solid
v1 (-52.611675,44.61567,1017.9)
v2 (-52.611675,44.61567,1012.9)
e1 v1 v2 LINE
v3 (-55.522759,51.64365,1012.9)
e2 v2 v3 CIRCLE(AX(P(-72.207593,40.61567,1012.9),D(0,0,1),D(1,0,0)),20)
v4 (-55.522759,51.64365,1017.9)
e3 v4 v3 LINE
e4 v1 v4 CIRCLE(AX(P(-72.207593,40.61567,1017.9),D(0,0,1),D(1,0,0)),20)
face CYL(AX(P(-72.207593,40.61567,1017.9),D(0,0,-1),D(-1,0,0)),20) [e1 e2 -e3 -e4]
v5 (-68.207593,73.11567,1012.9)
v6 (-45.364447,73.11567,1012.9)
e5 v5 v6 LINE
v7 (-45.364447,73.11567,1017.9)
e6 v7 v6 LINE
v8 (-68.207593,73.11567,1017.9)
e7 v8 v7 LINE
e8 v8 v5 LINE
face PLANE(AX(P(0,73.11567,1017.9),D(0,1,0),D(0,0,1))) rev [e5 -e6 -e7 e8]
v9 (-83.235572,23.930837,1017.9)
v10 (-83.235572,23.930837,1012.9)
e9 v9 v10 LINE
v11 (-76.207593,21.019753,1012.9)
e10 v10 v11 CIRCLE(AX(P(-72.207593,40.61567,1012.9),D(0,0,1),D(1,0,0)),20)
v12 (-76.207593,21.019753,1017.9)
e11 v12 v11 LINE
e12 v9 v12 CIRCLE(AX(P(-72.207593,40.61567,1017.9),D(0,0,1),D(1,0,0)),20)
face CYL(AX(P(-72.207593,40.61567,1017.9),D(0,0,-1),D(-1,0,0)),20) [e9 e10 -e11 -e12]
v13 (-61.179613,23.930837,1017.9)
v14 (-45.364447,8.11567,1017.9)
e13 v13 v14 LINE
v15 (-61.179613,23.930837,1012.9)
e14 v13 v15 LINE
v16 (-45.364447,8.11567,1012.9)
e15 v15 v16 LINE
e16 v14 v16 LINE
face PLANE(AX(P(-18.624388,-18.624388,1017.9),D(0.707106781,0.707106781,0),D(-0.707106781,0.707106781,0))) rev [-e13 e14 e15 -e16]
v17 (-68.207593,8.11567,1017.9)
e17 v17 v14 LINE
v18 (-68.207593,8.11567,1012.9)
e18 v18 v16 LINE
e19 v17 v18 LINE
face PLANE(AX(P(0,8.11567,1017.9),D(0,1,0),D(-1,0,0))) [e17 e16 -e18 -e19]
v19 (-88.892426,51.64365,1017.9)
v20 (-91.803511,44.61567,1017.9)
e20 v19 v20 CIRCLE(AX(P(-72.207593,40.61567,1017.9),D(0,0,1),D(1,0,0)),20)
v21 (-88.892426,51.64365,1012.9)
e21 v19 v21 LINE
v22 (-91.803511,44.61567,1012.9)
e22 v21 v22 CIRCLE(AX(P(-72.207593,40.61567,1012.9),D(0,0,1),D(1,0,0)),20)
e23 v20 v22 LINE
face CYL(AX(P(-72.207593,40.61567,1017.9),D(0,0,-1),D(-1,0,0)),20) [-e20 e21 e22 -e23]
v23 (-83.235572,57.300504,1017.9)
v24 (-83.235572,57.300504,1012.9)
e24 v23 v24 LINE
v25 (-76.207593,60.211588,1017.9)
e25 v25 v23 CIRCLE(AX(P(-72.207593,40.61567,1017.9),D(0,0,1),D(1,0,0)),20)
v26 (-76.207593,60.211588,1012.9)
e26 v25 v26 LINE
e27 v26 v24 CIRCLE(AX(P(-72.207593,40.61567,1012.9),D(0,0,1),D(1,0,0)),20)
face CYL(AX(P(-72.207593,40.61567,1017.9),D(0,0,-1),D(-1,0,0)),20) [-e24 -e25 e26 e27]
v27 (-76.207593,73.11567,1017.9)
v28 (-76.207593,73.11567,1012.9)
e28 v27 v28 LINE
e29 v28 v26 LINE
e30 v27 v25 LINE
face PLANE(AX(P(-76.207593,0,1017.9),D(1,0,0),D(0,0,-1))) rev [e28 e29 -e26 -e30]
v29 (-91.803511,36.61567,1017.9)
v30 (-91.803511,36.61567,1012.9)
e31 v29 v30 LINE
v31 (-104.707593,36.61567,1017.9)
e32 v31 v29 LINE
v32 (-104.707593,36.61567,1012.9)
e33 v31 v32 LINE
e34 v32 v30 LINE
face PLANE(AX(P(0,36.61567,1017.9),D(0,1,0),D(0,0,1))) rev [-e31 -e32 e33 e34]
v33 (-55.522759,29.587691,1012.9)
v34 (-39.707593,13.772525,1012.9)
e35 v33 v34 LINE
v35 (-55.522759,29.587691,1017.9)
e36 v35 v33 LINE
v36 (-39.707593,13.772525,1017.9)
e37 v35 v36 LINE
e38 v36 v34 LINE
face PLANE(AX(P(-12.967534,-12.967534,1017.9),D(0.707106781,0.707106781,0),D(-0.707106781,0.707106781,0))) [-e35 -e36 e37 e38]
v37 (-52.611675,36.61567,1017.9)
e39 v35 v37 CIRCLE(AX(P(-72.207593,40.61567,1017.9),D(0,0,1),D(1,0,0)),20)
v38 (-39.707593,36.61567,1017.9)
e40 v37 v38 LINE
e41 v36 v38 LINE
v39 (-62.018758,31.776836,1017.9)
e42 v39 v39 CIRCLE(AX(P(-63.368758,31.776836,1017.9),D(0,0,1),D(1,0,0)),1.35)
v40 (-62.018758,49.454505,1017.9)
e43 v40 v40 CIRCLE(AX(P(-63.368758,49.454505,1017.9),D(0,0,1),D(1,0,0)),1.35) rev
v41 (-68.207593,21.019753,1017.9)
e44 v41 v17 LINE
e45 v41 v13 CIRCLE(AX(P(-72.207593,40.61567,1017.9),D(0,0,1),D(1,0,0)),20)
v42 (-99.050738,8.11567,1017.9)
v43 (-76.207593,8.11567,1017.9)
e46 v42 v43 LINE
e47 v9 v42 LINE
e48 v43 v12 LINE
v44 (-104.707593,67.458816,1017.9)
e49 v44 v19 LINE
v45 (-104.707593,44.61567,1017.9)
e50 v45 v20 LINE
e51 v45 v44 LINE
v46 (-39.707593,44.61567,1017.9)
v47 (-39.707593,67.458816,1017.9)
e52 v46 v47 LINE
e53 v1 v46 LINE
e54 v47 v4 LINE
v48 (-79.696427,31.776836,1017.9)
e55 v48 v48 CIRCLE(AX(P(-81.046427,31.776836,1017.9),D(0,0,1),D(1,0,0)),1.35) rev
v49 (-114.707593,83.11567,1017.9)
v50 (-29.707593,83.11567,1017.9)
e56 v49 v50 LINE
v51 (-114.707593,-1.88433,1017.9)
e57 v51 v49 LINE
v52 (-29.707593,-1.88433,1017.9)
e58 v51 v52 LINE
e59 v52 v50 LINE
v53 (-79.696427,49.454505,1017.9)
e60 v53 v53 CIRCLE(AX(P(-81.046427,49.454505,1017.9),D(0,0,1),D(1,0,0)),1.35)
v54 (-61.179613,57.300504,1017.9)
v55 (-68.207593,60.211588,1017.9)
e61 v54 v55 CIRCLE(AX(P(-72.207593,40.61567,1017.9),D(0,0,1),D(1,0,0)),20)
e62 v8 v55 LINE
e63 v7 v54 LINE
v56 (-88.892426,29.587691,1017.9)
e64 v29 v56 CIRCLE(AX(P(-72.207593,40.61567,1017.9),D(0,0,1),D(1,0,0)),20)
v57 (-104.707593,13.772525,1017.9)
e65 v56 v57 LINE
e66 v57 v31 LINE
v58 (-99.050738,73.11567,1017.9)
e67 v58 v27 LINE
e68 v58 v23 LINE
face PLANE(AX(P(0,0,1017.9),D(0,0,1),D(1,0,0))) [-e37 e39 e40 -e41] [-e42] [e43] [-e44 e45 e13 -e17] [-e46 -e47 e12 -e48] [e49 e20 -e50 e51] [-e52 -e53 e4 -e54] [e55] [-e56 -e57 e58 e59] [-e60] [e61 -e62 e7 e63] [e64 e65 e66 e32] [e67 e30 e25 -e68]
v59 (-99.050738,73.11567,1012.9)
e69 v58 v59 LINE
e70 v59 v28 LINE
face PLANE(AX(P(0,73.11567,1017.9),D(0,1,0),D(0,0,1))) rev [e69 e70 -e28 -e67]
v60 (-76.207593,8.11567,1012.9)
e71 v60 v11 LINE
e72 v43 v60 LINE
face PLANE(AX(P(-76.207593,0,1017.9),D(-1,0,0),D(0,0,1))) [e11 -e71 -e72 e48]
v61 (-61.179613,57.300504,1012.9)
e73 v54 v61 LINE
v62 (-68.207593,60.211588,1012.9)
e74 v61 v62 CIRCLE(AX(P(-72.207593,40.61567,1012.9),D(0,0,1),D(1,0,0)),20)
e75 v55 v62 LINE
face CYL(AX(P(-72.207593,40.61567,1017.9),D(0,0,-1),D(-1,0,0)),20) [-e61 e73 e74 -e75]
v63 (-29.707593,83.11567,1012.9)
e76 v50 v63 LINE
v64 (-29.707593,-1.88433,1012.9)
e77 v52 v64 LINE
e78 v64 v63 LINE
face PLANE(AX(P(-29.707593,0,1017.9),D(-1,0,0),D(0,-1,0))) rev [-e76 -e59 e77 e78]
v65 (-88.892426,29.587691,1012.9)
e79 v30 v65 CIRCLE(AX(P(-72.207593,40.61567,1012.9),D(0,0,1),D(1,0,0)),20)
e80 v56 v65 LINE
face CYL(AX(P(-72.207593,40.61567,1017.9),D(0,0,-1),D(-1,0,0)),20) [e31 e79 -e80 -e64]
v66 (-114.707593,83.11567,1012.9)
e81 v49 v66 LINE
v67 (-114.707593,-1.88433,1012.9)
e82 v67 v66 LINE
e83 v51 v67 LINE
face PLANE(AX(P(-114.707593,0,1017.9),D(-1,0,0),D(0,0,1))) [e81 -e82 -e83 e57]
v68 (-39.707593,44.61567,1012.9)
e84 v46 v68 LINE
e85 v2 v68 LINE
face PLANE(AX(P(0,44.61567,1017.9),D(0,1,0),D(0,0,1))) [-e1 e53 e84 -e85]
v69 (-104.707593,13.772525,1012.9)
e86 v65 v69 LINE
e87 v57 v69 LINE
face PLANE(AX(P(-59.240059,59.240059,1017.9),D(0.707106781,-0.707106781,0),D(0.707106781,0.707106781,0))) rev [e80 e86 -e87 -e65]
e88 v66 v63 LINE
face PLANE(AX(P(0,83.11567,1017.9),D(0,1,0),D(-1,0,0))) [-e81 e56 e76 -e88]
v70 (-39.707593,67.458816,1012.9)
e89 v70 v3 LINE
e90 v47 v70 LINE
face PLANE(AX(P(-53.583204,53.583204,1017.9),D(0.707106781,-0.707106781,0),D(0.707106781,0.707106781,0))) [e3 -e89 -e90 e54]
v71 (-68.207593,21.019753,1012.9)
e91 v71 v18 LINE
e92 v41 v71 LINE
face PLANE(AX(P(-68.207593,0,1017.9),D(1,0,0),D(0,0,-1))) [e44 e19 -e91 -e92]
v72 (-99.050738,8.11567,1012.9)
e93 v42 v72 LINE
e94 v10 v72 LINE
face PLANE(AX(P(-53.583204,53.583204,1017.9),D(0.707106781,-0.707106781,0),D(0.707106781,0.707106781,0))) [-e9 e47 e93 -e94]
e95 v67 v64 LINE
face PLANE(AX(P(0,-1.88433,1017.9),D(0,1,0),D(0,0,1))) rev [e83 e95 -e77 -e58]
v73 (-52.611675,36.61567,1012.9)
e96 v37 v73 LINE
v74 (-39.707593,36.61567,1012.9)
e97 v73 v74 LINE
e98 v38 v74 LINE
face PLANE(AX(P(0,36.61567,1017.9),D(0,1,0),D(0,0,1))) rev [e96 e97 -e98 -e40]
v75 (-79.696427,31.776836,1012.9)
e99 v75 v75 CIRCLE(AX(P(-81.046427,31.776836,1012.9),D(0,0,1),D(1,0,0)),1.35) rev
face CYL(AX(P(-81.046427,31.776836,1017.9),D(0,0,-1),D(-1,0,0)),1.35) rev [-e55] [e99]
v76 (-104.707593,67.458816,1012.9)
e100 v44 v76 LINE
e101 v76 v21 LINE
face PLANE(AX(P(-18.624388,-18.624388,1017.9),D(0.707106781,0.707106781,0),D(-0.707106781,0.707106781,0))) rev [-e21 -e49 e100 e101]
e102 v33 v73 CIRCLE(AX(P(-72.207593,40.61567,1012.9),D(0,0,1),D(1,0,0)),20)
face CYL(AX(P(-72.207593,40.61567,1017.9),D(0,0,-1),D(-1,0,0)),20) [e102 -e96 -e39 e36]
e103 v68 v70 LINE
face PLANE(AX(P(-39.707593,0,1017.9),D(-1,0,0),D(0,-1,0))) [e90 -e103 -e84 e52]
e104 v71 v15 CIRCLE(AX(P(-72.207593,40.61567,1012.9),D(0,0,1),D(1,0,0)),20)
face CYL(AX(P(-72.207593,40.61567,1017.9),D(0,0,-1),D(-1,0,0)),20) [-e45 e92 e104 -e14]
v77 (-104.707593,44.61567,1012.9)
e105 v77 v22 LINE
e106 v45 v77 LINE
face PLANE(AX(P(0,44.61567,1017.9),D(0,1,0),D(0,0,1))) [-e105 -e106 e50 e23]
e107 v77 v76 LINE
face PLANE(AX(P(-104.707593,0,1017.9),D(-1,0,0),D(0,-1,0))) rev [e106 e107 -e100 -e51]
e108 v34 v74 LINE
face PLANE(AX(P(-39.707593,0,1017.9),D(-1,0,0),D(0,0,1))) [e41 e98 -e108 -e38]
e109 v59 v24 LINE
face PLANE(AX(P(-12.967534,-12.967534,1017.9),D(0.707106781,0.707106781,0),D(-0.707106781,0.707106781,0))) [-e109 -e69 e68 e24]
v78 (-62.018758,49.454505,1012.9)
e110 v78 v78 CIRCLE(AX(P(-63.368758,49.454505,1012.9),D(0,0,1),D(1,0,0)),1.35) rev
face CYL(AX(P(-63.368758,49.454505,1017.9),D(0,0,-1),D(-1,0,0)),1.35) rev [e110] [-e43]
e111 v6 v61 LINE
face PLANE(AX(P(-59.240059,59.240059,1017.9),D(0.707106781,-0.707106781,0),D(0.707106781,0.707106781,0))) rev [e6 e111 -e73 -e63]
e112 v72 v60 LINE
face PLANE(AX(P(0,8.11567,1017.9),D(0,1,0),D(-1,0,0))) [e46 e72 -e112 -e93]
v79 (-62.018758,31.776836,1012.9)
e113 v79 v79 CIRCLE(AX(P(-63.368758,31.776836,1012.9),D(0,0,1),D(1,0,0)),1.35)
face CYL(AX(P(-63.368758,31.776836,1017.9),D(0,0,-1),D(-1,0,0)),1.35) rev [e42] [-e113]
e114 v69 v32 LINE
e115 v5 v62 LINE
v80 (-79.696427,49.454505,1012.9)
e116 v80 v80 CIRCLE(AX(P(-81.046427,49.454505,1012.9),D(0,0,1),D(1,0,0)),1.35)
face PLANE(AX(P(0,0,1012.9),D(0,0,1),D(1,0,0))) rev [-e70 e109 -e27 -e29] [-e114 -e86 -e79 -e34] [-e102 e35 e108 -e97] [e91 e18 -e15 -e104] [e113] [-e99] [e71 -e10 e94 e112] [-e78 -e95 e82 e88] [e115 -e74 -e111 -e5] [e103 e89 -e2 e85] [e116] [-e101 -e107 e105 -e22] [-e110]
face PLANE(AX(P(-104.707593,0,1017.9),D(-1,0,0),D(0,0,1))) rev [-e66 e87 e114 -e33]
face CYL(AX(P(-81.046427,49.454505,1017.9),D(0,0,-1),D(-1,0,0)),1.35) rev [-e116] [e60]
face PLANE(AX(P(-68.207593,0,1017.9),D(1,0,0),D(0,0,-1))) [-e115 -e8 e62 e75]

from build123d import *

# Parameters (mm, degrees)
CROQUIS1_W              = 85
CROQUIS1_H              = 85
CROQUIS1_R              = 1.35
SALIENTE_EXTRUIR1_DEPTH = 5


with BuildPart() as part:
    # Croquis1 → Saliente-Extruir1 (new body)
    with BuildSketch(Plane.XY.offset(1012.9)):
        with Locations((-72.207592574, 40.615670498)):
            Rectangle(CROQUIS1_W, CROQUIS1_H)
        with BuildLine():
            Line((-99.050738324, 73.115670498), (-76.207592574, 73.115670498))
            Line((-76.207592574, 73.115670498), (-76.207592574, 60.21158844))
            ThreePointArc((-76.207592574, 60.21158844), (-79.861261221, 59.093261148), (-83.23557191, 57.300504083))
            Line((-83.23557191, 57.300504083), (-99.050738324, 73.115670498))
        make_face(mode=Mode.SUBTRACT)
        with BuildLine():
            Line((-104.707592574, 67.458816249), (-88.892426159, 51.643649834))
            ThreePointArc((-88.892426159, 51.643649834), (-90.685183224, 48.269339145), (-91.803510516, 44.615670498))
            Line((-91.803510516, 44.615670498), (-104.707592574, 44.615670498))
            Line((-104.707592574, 44.615670498), (-104.707592574, 67.458816249))
        make_face(mode=Mode.SUBTRACT)
        with BuildLine():
            Line((-104.707592574, 36.615670498), (-91.803510516, 36.615670498))
            ThreePointArc((-91.803510516, 36.615670498), (-90.685183224, 32.962001851), (-88.892426159, 29.587691162))
            Line((-88.892426159, 29.587691162), (-104.707592574, 13.772524748))
            Line((-104.707592574, 13.772524748), (-104.707592574, 36.615670498))
        make_face(mode=Mode.SUBTRACT)
        with BuildLine():
            Line((-99.050738324, 8.115670498), (-83.23557191, 23.930836913))
            ThreePointArc((-83.23557191, 23.930836913), (-79.861261221, 22.138079848), (-76.207592574, 21.019752556))
            Line((-76.207592574, 21.019752556), (-76.207592574, 8.115670498))
            Line((-76.207592574, 8.115670498), (-99.050738324, 8.115670498))
        make_face(mode=Mode.SUBTRACT)
        with BuildLine():
            Line((-68.207592574, 8.115670498), (-68.207592574, 21.019752556))
            ThreePointArc((-68.207592574, 21.019752556), (-64.553923927, 22.138079848), (-61.179613238, 23.930836913))
            Line((-61.179613238, 23.930836913), (-45.364446823, 8.115670498))
            Line((-45.364446823, 8.115670498), (-68.207592574, 8.115670498))
        make_face(mode=Mode.SUBTRACT)
        with BuildLine():
            Line((-39.707592574, 13.772524748), (-55.522758989, 29.587691162))
            ThreePointArc((-55.522758989, 29.587691162), (-53.730001924, 32.962001851), (-52.611674632, 36.615670498))
            Line((-52.611674632, 36.615670498), (-39.707592574, 36.615670498))
            Line((-39.707592574, 36.615670498), (-39.707592574, 13.772524748))
        make_face(mode=Mode.SUBTRACT)
        with BuildLine():
            ThreePointArc((-52.611674632, 44.615670498), (-53.730001924, 48.269339145), (-55.522758989, 51.643649834))
            Line((-55.522758989, 51.643649834), (-39.707592574, 67.458816249))
            Line((-39.707592574, 67.458816249), (-39.707592574, 44.615670498))
            Line((-39.707592574, 44.615670498), (-52.611674632, 44.615670498))
        make_face(mode=Mode.SUBTRACT)
        with BuildLine():
            Line((-45.364446823, 73.115670498), (-61.179613238, 57.300504083))
            ThreePointArc((-61.179613238, 57.300504083), (-64.553923927, 59.093261148), (-68.207592574, 60.21158844))
            Line((-68.207592574, 60.21158844), (-68.207592574, 73.115670498))
            Line((-68.207592574, 73.115670498), (-45.364446823, 73.115670498))
        make_face(mode=Mode.SUBTRACT)
        with Locations((-63.368757809, 49.454505263)):
            Circle(CROQUIS1_R, mode=Mode.SUBTRACT)
        with Locations((-81.046427339, 31.776835733)):
            Circle(CROQUIS1_R, mode=Mode.SUBTRACT)
        with Locations((-63.368757809, 31.776835733)):
            Circle(CROQUIS1_R, mode=Mode.SUBTRACT)
        with Locations((-81.046427339, 49.454505263)):
            Circle(CROQUIS1_R, mode=Mode.SUBTRACT)
    extrude(amount=SALIENTE_EXTRUIR1_DEPTH)


solid = part.part
